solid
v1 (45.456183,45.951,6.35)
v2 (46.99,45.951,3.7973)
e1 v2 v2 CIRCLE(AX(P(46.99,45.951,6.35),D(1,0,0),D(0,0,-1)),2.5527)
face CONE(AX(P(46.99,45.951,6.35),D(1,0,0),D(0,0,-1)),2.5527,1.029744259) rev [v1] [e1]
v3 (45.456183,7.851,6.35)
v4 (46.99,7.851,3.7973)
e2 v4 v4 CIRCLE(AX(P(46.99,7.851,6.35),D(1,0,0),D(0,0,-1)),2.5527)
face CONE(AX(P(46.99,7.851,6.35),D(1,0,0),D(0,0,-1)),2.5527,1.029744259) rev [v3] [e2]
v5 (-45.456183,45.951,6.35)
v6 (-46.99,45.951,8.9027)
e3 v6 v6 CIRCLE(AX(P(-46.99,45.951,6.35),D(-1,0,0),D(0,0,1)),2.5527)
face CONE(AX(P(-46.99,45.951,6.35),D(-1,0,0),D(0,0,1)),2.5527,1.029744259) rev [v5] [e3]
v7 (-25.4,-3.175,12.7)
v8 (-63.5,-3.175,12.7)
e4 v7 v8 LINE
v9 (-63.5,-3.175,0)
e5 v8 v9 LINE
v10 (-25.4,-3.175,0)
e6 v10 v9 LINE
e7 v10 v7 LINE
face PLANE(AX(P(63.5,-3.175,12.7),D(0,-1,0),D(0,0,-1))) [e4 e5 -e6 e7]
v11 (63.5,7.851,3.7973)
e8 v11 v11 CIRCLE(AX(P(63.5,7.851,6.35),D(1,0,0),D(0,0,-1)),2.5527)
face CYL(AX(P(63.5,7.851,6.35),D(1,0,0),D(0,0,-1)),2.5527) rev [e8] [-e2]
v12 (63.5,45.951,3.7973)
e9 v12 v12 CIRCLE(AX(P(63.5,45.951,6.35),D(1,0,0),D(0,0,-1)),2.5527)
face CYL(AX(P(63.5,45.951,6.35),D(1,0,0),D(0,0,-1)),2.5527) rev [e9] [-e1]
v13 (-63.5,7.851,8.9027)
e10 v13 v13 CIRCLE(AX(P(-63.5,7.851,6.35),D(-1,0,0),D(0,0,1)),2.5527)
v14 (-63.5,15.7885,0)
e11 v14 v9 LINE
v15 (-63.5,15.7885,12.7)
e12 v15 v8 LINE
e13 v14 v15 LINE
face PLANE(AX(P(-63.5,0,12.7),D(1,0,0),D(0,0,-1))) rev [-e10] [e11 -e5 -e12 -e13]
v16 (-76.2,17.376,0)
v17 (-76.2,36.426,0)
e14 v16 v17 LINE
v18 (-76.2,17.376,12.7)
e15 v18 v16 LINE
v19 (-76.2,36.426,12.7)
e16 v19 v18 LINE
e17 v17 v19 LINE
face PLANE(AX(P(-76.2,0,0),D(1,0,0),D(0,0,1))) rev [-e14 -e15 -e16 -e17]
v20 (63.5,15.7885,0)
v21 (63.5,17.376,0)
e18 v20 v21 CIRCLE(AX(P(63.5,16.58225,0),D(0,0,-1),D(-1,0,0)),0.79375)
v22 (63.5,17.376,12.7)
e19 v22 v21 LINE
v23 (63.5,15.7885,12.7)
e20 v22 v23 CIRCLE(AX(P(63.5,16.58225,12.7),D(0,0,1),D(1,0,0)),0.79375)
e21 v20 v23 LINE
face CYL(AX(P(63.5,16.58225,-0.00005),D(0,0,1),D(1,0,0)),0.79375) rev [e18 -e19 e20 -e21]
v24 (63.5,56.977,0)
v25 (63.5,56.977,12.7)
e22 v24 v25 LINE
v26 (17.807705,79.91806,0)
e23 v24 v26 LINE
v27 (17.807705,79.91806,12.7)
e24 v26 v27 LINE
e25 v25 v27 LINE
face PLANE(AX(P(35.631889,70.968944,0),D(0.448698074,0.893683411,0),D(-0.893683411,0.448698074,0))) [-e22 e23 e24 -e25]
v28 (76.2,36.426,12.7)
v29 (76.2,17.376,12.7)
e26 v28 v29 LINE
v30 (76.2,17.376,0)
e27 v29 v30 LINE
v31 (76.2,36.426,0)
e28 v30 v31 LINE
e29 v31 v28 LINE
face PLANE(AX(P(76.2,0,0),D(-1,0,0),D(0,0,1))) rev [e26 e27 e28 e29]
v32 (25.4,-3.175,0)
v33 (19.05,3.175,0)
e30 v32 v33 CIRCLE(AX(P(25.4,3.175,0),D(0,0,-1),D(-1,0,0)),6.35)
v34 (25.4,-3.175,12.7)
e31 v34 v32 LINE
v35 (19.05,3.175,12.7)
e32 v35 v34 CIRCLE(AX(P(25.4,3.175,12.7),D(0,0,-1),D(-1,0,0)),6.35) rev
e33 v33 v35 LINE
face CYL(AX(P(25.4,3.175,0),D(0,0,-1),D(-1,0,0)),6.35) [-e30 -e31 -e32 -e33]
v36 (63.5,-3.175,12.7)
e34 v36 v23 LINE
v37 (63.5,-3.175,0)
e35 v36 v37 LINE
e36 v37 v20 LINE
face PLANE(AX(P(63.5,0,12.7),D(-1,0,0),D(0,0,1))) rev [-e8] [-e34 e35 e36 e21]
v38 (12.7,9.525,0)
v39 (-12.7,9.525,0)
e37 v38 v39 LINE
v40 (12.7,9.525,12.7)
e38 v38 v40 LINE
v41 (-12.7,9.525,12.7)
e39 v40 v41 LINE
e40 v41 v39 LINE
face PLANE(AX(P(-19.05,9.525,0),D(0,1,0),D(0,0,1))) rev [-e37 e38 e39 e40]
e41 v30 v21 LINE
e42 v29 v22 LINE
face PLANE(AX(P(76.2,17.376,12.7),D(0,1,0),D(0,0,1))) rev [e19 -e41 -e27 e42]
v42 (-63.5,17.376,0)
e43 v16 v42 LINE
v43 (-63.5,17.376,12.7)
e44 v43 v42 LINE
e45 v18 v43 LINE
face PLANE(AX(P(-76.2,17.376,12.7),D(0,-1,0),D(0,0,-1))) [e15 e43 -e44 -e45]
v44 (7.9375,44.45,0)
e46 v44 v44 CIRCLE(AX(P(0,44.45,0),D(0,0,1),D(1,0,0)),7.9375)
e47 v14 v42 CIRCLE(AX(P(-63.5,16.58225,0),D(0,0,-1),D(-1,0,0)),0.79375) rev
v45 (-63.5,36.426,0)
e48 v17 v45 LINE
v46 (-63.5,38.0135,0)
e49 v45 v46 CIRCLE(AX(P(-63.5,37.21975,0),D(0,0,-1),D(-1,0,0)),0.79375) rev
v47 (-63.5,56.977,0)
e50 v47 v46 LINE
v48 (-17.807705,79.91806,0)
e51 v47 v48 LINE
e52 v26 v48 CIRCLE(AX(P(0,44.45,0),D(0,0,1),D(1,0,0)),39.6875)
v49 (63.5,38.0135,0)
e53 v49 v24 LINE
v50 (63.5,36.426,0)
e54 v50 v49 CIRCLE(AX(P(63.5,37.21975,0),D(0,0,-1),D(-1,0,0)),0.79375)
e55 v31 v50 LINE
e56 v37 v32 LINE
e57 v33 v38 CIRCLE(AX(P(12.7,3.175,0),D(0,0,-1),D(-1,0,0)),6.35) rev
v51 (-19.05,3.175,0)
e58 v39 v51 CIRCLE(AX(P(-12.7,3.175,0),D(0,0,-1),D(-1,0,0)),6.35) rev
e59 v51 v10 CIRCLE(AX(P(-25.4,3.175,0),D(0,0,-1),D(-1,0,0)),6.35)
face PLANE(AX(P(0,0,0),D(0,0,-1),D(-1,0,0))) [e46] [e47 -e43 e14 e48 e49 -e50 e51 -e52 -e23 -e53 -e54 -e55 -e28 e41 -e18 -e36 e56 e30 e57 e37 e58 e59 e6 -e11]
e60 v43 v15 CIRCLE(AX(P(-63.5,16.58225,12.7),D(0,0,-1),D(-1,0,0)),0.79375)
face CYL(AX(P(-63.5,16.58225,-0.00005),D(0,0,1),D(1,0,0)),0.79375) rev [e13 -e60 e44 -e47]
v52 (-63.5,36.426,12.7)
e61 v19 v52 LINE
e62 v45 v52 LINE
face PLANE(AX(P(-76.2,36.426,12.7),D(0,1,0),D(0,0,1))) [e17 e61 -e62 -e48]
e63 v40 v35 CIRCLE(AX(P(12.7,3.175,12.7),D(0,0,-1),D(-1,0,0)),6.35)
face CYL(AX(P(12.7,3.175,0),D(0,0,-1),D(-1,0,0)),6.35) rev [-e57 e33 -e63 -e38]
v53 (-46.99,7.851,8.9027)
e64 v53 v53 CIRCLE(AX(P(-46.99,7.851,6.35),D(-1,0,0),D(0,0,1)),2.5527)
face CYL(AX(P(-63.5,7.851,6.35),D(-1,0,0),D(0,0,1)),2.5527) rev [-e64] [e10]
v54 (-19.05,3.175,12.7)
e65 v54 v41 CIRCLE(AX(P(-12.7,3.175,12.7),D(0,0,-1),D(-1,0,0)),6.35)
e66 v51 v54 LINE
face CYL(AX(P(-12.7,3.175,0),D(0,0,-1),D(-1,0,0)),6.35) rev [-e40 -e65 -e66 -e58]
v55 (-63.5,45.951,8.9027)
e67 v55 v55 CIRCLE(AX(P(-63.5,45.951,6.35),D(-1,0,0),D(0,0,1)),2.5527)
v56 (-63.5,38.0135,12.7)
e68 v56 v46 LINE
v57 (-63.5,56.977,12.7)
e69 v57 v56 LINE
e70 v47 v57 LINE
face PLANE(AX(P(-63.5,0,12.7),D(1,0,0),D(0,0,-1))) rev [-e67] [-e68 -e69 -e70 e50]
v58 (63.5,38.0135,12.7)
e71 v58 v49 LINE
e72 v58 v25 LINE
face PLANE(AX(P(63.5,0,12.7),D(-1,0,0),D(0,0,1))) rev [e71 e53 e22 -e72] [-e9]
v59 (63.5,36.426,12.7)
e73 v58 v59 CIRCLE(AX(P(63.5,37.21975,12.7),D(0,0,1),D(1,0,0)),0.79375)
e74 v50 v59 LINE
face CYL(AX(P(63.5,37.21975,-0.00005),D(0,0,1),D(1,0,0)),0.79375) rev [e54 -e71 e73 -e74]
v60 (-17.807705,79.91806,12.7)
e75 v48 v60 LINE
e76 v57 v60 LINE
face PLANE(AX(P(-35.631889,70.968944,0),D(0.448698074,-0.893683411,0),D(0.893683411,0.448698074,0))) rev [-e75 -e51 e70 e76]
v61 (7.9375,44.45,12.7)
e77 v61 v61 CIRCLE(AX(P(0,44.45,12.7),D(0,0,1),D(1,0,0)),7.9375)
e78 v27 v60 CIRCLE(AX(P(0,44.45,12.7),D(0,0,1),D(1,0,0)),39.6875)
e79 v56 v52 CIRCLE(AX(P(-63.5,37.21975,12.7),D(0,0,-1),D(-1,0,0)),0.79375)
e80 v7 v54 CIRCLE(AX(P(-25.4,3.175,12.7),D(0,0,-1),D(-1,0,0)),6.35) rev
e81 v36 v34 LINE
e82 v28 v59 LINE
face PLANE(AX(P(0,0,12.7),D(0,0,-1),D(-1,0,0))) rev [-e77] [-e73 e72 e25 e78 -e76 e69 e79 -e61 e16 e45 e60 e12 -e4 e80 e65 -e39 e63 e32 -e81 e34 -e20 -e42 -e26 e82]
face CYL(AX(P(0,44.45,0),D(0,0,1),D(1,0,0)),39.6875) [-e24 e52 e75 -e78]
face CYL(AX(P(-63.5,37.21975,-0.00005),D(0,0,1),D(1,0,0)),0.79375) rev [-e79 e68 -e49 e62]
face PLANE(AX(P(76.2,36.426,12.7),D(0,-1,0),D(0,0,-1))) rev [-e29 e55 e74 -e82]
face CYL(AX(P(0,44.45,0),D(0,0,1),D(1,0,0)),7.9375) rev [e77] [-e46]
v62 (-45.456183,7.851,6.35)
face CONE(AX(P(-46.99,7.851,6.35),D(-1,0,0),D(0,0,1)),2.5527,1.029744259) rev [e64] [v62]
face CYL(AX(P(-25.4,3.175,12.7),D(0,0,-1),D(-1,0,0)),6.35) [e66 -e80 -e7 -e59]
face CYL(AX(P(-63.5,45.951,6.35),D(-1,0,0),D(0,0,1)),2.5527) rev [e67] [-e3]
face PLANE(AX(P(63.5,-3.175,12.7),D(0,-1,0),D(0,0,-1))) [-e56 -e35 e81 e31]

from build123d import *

# Parameters (mm, degrees)
SKETCH1_W                        = 127
SKETCH1_H                        = 152.4
BOSS_EXTRUDE1_DEPTH              = 12.7
SKETCH2_R                        = 7.9375
CUT_EXTRUDE1_DEPTH               = 166.587741092
SKETCH3_W                        = 127
SKETCH3_H                        = 3.175
BOSS_EXTRUDE2_DEPTH              = 12.7
SKETCH4_W                        = 38.1
SKETCH4_H                        = 12.7
CUT_EXTRUDE2_DEPTH               = 107.172778556
FILLET1_R                        = 6.35
F_1_4_20_TAPPED_HOLE1_AT_2_COUNT = 2
F_1_4_20_TAPPED_HOLE1_AT_2_PITCH = 38.1
SKETCH7_W                        = 12.7
SKETCH7_H                        = 19.05
BOSS_EXTRUDE3_DEPTH              = 12.7
SKETCH8_R                        = 0.79375
CUT_EXTRUDE3_DEPTH               = 115.222803793


with BuildPart() as part:
    # Sketch1 → Boss-Extrude1 (new body)
    with BuildSketch(Plane.XY):
        with Locations((0, 76.2)):
            Rectangle(SKETCH1_W, SKETCH1_H)
    extrude(amount=BOSS_EXTRUDE1_DEPTH)

    # Sketch2 → Cut-Extrude1 (cut, through all)
    with BuildSketch(Plane.XY.offset(12.7)):
        with BuildLine():
            Line((-63.5, 152.4), (-63.5, 56.977000238))
            Line((-63.5, 56.977000238), (-17.807704814, 79.918060357))
            ThreePointArc((-17.807704814, 79.918060357), (0, 84.1375), (17.807704814, 79.918060357))
            Line((17.807704814, 79.918060357), (63.5, 56.977000238))
            Line((63.5, 56.977000238), (63.5, 152.4))
            Line((63.5, 152.4), (-63.5, 152.4))
        make_face()
        with Locations((0, 44.45)):
            Circle(SKETCH2_R)
    extrude(amount=-CUT_EXTRUDE1_DEPTH, mode=Mode.SUBTRACT)

    # Sketch3 → Boss-Extrude2 (add)
    with BuildSketch(Plane(origin=(0, 0, 0), x_dir=(-1, 0, 0), z_dir=(0, 0, -1))):
        with Locations((0, -1.5875)):
            Rectangle(SKETCH3_W, SKETCH3_H)
    extrude(amount=-BOSS_EXTRUDE2_DEPTH)

    # Sketch4 → Cut-Extrude2 (cut, through all)
    with BuildSketch(Plane.XY.offset(12.7)):
        with Locations((0, 3.175)):
            Rectangle(SKETCH4_W, SKETCH4_H)
    extrude(amount=-CUT_EXTRUDE2_DEPTH, mode=Mode.SUBTRACT)

    # Fillet1
    fillet1_edges = [part.edges().sort_by_distance(p)[0] for p in [
        (-19.05, 9.525, 6.35),
        (19.05, 9.525, 6.35),
    ]]
    fillet(fillet1_edges, radius=FILLET1_R)
    fillet1_2_edges = [part.edges().sort_by_distance(p)[0] for p in [
        (-19.05, -3.175, 6.35),
        (19.05, -3.175, 6.35),
    ]]
    fillet(fillet1_2_edges, radius=FILLET1_R - 0.0001)  # a hair under: the kernel refuses the full size

    # Sketch5 → 1/4-20 Tapped Hole1 (revolve, cut)
    with BuildSketch(Plane(origin=(63.5, 45.951000119, 6.35), x_dir=(0, 0, -1), z_dir=(0, 1, 0))):
        Polygon((0, 0), (0, 18.043816902), (2.5527, 16.51), (2.5527, 0), align=None)
    f_1_4_20_tapped_hole1 = revolve(axis=Axis((69.85, 45.951000119, 6.35), (-1, 0, 0)), mode=Mode.SUBTRACT)

    # 1/4-20 Tapped Hole1 at 2: 1/4-20 Tapped Hole1 ×2
    with Locations(*[(0, -i * F_1_4_20_TAPPED_HOLE1_AT_2_PITCH, 0) for i in range(1, F_1_4_20_TAPPED_HOLE1_AT_2_COUNT)]):
        add(f_1_4_20_tapped_hole1, mode=Mode.SUBTRACT)

    # Sketch7 → Boss-Extrude3 (add)
    with BuildSketch(Plane(origin=(63.5, 0, 0), x_dir=(0, 0, -1), z_dir=(1, 0, 0))):
        with Locations((-6.35, 26.901000119)):
            Rectangle(SKETCH7_W, SKETCH7_H)
    boss_extrude3 = extrude(amount=BOSS_EXTRUDE3_DEPTH)

    # Sketch8 → Cut-Extrude3 (cut, through all)
    with BuildSketch(Plane.XY.offset(12.7)):
        with Locations((63.5, 37.219750119)):
            Circle(SKETCH8_R)
        with Locations((63.5, 16.582250119)):
            Circle(SKETCH8_R)
    cut_extrude3 = extrude(amount=-CUT_EXTRUDE3_DEPTH, mode=Mode.SUBTRACT)

    # Mirror1: 1/4-20 Tapped Hole1, Boss-Extrude3, Cut-Extrude3 across plane
    add(f_1_4_20_tapped_hole1.mirror(Plane(origin=(0, 0, 0), x_dir=(0, 0, 1), z_dir=(1, 0, 0))), mode=Mode.SUBTRACT)
    add(boss_extrude3.mirror(Plane(origin=(0, 0, 0), x_dir=(0, 0, 1), z_dir=(1, 0, 0))))
    add(cut_extrude3.mirror(Plane(origin=(0, 0, 0), x_dir=(0, 0, 1), z_dir=(1, 0, 0))), mode=Mode.SUBTRACT)

    # Mirror1 copy 1 sketch → Mirror1 copy 1 (revolve, cut)
    with BuildSketch(Plane(origin=(-63.5, 7.851000119, 6.35), x_dir=(0, 0, -1), z_dir=(0, 1, 0))):
        Polygon((0, 0), (0, -18.043816902), (2.5527, -16.51), (2.5527, 0), align=None)
    revolve(axis=Axis((-69.85, 7.851000119, 6.35), (-1, 0, 0)), mode=Mode.SUBTRACT)


solid = part.part
